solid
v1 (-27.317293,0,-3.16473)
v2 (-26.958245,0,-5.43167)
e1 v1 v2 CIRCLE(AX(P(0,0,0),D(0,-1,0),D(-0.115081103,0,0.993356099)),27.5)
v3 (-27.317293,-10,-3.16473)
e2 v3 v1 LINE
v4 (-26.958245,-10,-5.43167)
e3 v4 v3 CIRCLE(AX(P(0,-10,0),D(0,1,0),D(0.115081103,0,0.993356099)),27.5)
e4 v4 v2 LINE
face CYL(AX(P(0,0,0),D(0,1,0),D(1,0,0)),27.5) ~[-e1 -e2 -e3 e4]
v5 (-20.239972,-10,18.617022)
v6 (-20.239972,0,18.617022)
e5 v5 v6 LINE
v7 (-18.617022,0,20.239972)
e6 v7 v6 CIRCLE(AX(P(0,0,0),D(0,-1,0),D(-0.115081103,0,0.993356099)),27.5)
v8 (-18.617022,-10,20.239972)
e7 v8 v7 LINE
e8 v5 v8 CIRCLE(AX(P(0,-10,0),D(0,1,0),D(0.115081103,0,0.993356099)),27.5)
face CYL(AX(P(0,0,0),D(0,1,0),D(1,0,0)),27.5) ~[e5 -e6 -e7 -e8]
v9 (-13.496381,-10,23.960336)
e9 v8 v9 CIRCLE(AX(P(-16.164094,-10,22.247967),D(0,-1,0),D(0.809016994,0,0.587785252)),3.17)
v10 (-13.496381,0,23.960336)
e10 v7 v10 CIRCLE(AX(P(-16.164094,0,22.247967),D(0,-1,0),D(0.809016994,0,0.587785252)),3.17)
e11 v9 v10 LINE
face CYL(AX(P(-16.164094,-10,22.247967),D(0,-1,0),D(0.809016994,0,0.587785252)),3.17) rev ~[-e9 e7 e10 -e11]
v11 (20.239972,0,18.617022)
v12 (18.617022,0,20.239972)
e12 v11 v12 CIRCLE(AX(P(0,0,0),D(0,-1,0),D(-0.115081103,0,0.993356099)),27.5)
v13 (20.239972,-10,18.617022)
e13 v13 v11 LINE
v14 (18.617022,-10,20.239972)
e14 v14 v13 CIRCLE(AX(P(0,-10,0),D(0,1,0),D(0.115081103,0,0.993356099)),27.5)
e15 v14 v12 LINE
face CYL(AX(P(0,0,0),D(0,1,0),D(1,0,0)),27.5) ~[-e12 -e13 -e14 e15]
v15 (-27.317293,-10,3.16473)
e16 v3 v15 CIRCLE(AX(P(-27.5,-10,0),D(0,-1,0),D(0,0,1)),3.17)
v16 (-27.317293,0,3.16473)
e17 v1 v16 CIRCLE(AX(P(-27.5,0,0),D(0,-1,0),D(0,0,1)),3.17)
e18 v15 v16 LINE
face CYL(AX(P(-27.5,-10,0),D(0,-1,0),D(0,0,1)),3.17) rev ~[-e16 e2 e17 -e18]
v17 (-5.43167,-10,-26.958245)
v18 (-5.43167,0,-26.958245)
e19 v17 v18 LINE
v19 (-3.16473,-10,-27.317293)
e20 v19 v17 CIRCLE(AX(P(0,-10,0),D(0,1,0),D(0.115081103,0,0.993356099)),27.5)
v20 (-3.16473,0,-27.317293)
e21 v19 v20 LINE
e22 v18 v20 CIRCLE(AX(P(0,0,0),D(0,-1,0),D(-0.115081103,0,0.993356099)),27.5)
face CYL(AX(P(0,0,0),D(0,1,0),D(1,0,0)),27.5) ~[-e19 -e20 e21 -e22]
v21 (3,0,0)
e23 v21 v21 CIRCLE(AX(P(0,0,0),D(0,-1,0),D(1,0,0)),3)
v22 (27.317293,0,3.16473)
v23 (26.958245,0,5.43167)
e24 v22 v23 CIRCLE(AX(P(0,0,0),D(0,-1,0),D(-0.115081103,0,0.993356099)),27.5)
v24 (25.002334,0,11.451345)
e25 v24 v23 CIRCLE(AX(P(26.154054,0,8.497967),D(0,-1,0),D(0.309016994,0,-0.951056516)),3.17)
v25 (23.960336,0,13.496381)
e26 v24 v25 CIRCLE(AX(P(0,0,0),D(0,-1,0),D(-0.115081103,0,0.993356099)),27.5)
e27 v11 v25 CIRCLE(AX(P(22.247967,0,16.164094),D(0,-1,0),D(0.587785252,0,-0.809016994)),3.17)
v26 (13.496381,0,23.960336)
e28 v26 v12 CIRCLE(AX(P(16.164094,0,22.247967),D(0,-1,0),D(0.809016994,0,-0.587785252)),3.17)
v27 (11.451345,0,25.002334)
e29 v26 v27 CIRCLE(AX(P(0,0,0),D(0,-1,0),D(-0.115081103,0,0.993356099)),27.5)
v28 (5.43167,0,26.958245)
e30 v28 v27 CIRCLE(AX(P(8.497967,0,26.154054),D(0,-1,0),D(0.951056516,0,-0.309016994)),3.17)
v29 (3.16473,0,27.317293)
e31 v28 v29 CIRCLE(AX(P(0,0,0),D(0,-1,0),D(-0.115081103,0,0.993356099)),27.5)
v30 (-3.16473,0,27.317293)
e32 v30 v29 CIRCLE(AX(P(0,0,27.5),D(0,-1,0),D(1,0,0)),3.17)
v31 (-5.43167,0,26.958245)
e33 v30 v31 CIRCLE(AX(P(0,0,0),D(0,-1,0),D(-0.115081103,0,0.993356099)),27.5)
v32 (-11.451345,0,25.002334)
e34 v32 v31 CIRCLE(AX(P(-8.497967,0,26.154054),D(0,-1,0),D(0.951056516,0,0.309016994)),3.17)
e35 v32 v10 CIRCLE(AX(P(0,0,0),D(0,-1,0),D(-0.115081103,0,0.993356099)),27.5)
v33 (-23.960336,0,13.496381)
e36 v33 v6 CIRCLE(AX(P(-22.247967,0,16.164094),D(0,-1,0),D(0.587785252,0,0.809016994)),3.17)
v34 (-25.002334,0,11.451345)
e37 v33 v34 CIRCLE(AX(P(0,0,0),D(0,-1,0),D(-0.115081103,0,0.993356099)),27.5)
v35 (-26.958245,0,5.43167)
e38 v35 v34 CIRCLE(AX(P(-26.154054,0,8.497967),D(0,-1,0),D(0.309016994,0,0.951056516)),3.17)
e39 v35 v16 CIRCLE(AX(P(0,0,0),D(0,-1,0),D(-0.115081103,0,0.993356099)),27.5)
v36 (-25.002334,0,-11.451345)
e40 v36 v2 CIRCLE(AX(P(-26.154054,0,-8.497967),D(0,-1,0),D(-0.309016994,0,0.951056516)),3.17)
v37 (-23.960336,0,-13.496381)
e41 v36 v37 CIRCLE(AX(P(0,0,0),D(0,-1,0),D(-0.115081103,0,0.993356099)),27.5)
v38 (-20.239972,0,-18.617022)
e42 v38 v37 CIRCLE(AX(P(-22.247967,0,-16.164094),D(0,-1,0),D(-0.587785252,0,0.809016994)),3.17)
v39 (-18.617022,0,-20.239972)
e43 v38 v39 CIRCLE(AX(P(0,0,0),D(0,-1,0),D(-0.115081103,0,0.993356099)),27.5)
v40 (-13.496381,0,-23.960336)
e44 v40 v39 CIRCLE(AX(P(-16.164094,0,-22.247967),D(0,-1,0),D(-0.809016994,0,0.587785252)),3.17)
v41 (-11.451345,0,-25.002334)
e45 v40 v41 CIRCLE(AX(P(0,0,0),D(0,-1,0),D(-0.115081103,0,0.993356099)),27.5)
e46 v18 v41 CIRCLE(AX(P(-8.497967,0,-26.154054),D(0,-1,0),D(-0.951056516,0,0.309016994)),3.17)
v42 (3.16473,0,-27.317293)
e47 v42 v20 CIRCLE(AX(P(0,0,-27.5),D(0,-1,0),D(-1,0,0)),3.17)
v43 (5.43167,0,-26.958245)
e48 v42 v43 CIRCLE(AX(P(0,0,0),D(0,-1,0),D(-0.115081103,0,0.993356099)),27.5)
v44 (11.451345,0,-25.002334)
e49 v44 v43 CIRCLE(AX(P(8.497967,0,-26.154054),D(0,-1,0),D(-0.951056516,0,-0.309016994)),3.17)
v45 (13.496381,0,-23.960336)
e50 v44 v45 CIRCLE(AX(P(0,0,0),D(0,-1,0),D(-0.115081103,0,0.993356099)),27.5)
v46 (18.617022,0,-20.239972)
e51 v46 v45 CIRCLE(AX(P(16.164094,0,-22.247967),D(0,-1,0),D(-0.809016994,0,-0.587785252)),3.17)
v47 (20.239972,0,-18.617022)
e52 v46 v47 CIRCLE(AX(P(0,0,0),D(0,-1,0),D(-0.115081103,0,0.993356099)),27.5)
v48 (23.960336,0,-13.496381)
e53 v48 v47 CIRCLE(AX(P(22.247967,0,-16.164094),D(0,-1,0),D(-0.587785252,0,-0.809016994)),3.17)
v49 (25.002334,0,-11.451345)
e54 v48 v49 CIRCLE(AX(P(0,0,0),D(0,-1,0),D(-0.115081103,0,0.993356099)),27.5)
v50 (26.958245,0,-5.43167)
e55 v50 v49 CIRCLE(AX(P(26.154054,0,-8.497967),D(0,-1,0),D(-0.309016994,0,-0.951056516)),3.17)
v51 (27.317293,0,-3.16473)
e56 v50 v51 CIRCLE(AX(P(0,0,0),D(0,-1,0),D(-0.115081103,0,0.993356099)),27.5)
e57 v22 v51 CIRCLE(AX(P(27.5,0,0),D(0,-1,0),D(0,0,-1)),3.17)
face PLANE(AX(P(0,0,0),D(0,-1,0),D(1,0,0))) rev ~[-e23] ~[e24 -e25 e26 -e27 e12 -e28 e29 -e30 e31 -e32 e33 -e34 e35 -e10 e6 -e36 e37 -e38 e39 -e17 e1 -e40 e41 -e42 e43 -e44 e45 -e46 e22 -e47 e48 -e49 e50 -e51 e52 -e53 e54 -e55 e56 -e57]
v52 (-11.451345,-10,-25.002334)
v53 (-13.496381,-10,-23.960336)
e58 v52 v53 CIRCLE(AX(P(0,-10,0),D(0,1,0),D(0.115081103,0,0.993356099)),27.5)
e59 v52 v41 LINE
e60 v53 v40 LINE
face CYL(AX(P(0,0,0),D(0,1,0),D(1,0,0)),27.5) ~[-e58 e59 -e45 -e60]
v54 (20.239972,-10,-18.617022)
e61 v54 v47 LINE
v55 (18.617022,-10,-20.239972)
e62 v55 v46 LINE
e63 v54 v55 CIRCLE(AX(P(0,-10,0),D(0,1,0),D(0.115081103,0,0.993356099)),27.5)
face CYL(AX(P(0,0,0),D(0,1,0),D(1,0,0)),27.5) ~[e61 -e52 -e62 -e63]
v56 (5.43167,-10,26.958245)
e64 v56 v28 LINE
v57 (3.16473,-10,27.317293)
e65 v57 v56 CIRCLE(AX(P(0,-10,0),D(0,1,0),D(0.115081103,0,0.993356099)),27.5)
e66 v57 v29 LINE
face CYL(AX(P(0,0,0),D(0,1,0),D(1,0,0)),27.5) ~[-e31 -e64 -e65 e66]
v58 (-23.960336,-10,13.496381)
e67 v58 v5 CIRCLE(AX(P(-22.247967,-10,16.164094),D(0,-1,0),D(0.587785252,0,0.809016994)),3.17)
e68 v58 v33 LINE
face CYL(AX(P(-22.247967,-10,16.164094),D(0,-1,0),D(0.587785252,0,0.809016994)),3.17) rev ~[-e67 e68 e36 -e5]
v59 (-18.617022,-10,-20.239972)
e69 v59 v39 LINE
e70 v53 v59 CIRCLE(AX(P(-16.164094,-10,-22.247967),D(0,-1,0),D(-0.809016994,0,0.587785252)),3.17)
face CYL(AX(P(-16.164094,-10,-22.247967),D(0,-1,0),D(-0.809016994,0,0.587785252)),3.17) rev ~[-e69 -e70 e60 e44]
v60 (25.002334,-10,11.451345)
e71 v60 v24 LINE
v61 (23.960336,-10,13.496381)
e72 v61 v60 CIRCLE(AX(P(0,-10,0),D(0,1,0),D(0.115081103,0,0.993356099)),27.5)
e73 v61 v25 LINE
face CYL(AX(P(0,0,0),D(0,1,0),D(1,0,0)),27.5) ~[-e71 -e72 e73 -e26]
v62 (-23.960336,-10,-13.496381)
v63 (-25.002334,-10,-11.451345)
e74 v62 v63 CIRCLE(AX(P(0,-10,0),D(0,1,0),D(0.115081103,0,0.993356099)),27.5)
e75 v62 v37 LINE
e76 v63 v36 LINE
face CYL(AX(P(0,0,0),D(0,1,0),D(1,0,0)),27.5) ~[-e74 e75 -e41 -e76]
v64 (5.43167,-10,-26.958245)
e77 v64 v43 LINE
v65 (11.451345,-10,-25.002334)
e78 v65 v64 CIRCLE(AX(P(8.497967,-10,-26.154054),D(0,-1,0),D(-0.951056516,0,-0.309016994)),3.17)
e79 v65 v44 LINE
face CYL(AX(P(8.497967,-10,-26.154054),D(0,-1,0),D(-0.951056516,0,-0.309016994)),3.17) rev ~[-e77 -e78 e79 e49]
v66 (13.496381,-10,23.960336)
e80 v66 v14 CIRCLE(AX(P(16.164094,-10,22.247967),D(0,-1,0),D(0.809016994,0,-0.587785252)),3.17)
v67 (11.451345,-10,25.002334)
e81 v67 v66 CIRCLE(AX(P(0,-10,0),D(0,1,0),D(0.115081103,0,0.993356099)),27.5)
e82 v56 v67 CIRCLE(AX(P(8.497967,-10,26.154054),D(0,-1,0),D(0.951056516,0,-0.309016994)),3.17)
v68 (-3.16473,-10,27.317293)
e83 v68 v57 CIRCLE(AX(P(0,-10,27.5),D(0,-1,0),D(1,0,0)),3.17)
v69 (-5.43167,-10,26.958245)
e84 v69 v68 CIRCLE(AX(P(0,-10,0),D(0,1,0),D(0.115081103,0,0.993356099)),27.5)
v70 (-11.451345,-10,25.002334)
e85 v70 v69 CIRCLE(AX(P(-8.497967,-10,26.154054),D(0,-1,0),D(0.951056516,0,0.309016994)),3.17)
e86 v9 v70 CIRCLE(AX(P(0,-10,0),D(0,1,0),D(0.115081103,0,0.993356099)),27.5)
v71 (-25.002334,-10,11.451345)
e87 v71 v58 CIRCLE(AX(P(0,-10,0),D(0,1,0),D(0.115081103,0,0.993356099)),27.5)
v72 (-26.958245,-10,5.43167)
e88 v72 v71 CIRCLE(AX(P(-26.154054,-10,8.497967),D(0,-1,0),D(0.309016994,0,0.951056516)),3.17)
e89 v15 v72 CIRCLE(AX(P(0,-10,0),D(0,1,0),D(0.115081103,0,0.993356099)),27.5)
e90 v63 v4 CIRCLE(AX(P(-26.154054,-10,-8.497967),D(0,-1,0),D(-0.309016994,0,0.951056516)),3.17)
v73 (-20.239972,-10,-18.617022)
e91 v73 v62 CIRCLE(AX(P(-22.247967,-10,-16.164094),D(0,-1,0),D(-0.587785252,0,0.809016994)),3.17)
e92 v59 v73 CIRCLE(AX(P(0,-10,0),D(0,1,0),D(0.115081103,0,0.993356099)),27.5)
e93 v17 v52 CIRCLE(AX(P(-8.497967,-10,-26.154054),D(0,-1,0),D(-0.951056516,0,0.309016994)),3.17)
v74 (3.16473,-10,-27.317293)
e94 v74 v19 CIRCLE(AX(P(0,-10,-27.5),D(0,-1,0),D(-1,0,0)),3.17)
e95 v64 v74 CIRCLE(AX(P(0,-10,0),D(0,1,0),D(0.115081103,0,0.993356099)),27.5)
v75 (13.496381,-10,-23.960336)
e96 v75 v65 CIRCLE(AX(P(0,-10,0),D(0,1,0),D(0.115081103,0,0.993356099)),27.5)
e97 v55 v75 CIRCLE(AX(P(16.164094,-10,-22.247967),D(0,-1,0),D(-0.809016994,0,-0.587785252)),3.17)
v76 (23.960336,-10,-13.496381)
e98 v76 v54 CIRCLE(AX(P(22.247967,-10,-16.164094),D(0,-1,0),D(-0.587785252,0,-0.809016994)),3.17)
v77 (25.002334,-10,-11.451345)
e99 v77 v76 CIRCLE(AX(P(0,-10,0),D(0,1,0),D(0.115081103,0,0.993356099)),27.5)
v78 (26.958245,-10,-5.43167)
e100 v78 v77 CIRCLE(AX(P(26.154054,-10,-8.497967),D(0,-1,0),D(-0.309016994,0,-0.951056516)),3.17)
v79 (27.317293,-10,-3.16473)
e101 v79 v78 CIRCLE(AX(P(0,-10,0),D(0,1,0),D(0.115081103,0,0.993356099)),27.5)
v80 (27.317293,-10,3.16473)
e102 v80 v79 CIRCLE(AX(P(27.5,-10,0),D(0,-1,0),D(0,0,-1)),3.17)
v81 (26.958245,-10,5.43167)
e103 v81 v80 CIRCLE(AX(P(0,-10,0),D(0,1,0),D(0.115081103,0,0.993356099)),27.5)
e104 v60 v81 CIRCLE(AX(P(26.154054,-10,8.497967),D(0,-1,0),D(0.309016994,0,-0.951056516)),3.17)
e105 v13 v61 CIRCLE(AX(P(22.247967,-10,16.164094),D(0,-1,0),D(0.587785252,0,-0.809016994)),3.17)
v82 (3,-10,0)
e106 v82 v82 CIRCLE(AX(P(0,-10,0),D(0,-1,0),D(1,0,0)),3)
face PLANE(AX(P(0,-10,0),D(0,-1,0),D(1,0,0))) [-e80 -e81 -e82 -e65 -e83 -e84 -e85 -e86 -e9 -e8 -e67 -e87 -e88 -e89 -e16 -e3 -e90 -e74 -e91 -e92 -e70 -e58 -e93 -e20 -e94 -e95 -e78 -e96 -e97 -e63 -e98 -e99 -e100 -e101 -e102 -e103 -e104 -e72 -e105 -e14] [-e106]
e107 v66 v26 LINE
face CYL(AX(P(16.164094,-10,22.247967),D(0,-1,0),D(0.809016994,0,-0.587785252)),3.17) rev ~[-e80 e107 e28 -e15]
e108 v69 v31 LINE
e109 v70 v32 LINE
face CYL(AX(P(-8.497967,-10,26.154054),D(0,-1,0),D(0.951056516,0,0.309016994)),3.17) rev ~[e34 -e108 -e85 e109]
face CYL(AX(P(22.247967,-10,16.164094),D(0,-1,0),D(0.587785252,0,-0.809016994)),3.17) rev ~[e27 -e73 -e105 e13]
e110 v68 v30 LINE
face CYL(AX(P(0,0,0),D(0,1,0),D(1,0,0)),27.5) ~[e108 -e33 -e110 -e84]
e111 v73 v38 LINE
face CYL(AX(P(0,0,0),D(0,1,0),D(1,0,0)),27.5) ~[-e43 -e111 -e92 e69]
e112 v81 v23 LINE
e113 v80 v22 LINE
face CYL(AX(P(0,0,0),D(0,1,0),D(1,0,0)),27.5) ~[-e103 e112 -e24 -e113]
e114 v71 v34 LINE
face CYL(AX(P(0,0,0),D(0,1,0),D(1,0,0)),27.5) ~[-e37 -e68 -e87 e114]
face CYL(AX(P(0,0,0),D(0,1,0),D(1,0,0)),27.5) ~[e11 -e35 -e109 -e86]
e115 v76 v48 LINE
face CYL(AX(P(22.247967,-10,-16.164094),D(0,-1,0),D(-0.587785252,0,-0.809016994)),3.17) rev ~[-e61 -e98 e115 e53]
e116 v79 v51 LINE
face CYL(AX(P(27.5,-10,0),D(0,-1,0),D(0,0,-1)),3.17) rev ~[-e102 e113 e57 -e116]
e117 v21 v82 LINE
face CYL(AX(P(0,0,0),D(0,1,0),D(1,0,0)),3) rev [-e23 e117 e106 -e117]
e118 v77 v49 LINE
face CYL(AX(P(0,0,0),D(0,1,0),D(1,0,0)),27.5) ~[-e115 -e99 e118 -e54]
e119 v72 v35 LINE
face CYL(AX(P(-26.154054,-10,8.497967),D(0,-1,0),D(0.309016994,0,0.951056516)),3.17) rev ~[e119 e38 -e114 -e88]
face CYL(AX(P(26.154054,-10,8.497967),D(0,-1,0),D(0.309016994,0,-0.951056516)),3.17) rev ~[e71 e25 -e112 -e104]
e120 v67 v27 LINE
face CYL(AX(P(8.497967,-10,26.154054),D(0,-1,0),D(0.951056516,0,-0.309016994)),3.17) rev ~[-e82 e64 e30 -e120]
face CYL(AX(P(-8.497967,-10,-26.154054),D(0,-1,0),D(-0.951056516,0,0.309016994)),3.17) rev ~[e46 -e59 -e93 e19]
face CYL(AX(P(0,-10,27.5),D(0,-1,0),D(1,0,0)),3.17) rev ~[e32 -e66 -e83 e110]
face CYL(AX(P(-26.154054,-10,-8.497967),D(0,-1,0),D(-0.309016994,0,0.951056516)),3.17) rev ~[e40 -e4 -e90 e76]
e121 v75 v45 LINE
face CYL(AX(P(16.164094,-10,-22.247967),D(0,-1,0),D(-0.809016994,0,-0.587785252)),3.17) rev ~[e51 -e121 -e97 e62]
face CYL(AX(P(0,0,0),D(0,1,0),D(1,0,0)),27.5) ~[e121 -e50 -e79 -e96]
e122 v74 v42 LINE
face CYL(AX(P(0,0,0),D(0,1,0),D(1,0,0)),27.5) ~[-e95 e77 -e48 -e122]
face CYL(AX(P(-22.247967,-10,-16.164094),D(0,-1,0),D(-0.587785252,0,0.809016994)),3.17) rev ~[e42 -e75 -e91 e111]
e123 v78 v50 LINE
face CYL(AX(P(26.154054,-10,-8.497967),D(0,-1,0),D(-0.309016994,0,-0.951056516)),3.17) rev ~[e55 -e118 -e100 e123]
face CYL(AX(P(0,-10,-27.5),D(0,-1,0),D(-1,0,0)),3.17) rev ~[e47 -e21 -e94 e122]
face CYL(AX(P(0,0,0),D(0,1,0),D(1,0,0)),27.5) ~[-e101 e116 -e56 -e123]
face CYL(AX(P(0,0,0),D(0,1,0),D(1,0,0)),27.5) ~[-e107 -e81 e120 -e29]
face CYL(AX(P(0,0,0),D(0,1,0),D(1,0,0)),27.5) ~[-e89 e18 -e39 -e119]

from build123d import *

# Parameters (mm, degrees)
F0_R            = 27.5
F0_R_2          = 3
F1_DEPTH        = 10
F2_R            = 3.17
F3_DEPTH        = 10.001
F3_COPIES_COUNT = 20


# Not quite as in the source:
# - a pattern or mirror of a feature is missing from the dataset's text; its kind, count and spacing are read off the source's solid


with BuildPart() as f1:
    # F0 (on Front) → F1 (new body)
    with BuildSketch(Plane.XZ):
        Circle(F0_R)
        Circle(F0_R_2, mode=Mode.SUBTRACT)
    extrude(amount=F1_DEPTH)

    # F2 (on face) → F3 (cut, through all)
    with BuildSketch(Plane.XZ.offset(10)):
        with Locations((0, 27.5)):
            Circle(F2_R)
    f3 = extrude(amount=-F3_DEPTH, mode=Mode.SUBTRACT)

    # F3_copies: F3 ×20 about axis
    f3_copies_axis = Axis((0, 0, 0), (0, 1, 0))
    for i in range(1, F3_COPIES_COUNT):
        add(f3.rotate(f3_copies_axis, i * 360 / F3_COPIES_COUNT), mode=Mode.SUBTRACT)


solid = f1.part
